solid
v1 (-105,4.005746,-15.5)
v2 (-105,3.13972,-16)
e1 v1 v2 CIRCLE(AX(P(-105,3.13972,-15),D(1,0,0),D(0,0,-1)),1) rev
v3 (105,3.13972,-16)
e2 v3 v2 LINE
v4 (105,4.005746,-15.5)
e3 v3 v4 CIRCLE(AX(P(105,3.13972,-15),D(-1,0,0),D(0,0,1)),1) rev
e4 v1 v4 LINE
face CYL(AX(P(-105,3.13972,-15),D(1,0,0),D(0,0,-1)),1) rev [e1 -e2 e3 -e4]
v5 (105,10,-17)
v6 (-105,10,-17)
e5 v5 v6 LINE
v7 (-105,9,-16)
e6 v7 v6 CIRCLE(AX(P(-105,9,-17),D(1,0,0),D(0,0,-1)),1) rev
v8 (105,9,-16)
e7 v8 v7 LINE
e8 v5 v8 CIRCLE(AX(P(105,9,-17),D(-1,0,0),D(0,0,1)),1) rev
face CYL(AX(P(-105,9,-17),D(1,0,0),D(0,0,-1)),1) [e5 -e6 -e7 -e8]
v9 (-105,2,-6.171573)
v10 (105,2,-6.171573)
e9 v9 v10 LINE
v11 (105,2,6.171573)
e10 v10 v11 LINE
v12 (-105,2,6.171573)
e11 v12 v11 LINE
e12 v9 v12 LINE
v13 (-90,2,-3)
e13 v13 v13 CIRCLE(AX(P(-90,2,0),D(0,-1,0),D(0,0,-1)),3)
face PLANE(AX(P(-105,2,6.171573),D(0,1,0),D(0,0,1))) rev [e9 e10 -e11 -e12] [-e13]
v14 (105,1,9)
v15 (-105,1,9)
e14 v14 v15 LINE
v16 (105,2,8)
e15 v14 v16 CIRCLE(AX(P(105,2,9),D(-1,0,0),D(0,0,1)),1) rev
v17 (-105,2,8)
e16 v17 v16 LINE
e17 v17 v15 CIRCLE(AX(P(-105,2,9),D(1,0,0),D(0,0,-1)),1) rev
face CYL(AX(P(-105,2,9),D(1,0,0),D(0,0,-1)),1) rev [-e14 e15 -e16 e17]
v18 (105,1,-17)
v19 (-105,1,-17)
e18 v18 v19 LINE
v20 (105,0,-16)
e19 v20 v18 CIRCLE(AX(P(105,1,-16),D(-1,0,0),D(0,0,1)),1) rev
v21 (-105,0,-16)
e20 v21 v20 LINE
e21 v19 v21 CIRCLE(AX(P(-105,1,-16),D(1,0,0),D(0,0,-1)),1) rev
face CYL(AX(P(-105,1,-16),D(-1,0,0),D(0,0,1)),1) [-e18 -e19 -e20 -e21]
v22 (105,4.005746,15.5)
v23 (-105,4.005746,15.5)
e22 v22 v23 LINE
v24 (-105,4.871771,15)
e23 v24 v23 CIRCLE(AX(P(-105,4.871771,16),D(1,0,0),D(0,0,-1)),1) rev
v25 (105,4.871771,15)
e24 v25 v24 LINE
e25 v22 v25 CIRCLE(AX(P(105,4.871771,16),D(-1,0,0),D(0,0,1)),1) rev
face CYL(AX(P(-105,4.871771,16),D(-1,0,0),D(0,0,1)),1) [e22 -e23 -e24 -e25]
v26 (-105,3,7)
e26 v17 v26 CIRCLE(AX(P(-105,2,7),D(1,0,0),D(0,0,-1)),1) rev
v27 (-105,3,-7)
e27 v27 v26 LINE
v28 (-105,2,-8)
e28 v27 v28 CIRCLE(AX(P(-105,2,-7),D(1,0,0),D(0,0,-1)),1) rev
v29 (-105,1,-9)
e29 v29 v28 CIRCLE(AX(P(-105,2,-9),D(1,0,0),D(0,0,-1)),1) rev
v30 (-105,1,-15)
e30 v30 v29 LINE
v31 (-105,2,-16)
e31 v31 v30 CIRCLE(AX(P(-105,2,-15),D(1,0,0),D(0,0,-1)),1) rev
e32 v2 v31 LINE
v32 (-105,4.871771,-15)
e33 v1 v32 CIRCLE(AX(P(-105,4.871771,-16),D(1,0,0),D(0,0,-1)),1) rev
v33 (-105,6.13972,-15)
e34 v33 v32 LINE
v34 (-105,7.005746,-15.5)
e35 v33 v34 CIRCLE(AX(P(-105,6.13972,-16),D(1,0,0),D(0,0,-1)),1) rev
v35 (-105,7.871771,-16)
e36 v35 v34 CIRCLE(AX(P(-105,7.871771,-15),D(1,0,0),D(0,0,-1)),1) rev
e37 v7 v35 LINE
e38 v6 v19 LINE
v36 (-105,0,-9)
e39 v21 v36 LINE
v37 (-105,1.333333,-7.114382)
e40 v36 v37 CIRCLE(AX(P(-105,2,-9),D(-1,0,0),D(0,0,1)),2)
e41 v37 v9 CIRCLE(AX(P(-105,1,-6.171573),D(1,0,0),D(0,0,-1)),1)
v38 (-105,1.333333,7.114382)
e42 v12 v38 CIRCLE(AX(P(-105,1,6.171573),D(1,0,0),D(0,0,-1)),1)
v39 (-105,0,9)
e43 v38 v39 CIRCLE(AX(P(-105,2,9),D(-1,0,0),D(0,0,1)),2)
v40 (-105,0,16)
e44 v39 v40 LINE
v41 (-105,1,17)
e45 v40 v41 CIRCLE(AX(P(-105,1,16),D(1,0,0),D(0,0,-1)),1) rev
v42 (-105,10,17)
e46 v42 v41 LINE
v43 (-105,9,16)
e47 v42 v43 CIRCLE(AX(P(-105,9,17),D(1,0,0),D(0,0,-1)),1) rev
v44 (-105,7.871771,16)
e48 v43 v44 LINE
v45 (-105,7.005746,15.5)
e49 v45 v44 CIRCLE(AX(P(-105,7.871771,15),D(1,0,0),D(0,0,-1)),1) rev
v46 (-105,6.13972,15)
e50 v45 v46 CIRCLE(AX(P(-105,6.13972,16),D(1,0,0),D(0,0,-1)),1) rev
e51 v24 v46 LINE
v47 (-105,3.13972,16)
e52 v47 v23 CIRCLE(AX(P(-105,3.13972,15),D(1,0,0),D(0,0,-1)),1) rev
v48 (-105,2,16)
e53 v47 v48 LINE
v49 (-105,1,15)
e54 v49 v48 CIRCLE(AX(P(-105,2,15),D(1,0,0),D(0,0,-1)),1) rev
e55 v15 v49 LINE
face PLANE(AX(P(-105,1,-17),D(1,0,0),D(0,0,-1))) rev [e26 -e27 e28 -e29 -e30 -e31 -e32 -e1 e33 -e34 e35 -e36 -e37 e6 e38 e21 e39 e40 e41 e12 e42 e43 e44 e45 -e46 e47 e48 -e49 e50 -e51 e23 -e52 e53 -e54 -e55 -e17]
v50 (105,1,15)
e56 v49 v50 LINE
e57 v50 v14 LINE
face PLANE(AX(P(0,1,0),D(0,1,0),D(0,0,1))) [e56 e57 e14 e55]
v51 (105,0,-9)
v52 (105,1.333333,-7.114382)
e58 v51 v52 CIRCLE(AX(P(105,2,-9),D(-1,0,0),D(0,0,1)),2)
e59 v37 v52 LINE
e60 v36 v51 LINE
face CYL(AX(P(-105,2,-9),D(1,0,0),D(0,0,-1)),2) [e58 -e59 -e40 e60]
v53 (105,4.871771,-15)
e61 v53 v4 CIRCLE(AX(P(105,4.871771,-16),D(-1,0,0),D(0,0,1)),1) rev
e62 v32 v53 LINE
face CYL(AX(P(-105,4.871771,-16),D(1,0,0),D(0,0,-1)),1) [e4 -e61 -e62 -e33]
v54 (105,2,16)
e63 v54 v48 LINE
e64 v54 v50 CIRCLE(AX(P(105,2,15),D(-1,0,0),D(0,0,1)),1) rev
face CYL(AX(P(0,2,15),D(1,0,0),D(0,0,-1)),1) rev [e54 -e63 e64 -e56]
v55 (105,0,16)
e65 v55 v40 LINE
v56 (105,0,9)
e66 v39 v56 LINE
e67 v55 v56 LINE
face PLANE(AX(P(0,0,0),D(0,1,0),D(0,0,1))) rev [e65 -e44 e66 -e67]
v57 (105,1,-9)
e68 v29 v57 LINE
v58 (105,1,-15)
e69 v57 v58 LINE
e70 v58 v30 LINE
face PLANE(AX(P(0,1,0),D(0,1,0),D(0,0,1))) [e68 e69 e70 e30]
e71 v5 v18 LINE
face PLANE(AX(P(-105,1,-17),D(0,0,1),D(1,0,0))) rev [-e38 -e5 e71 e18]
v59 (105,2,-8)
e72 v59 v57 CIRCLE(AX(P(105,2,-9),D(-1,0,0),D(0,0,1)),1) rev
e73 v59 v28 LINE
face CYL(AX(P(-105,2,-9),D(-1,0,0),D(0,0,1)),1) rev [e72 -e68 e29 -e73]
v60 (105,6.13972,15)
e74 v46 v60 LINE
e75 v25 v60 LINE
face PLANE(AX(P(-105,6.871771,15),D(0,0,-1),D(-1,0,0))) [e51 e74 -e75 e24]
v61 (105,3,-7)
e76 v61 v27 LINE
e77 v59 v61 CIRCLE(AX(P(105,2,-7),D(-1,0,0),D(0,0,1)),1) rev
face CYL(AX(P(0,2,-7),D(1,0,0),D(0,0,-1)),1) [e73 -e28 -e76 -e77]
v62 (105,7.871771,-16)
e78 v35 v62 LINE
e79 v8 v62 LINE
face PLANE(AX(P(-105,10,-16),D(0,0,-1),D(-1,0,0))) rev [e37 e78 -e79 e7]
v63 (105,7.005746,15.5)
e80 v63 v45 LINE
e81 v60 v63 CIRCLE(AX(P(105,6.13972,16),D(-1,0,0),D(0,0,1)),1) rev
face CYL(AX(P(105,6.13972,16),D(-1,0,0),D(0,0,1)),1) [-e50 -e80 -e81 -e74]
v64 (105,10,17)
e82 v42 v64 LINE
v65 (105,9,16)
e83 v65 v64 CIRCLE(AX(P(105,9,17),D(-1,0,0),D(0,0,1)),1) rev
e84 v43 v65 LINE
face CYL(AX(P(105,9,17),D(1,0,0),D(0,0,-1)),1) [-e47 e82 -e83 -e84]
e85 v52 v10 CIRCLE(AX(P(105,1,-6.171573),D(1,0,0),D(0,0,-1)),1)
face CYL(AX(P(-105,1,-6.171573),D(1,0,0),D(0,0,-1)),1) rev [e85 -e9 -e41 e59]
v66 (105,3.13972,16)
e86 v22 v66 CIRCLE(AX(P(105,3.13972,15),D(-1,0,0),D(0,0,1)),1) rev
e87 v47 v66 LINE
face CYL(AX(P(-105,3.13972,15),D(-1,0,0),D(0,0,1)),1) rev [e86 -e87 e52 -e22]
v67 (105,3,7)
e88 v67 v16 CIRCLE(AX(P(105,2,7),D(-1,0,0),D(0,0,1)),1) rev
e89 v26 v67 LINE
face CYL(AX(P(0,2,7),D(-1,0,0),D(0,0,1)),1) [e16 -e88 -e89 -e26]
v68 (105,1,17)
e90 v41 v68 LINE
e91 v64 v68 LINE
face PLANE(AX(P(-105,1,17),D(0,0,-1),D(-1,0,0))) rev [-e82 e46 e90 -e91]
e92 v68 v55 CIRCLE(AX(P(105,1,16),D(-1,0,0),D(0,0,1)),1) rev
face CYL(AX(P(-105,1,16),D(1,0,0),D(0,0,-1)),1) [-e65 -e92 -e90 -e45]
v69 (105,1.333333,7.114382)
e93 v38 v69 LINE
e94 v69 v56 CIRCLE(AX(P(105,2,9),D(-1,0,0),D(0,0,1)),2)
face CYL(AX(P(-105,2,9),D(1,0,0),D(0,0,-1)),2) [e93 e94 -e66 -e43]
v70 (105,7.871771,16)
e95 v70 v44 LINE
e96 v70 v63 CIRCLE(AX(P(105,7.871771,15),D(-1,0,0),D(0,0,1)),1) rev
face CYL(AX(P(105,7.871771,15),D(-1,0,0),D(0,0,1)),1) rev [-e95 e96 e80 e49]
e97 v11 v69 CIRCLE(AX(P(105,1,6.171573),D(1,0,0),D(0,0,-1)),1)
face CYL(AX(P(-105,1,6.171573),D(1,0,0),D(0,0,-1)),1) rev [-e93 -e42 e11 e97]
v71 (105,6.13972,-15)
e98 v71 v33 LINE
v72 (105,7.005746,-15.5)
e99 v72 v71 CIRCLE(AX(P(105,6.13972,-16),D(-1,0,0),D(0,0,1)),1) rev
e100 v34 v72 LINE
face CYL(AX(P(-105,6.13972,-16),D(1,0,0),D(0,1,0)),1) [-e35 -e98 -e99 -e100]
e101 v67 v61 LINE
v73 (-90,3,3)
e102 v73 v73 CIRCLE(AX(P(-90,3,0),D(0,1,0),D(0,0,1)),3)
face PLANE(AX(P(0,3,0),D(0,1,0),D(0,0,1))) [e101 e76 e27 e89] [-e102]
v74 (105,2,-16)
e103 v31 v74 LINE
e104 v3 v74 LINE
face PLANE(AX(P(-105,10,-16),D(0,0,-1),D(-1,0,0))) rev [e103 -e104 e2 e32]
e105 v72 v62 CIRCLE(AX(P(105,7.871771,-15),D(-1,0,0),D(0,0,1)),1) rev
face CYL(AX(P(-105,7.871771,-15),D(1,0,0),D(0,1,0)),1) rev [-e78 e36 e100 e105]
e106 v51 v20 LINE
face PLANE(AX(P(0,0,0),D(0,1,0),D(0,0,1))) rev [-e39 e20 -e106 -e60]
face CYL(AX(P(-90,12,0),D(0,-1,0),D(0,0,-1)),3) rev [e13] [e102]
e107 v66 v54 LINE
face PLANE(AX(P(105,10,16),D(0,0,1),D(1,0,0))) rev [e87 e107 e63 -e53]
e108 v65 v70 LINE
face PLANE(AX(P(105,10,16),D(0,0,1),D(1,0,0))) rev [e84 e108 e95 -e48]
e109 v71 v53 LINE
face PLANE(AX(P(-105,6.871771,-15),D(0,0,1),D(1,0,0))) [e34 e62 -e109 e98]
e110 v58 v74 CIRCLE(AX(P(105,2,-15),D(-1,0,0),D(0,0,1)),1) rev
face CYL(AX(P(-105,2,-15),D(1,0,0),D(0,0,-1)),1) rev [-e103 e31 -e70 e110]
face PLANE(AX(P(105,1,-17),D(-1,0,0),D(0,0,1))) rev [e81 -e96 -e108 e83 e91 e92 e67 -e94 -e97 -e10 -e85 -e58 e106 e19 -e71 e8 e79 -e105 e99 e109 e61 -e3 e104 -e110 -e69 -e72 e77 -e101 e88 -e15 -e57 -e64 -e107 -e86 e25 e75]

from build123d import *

# Parameters (mm, degrees)
SKETCH1_W           = 210
SKETCH1_H           = 34
BOSS_EXTRUDE1_DEPTH = 1
SKETCH2_W           = 210
SKETCH2_H           = 1
BOSS_EXTRUDE2_DEPTH = 9
SKETCH3_W           = 210
SKETCH3_H           = 16
BOSS_EXTRUDE3_DEPTH = 2
FILLET1_R           = 1
FILLET2_R           = 1
FILLET3_R           = 1
FILLET4_R           = 1
FILLET5_R           = 1
FILLET6_R           = 1
CUT_EXTRUDE1_DEPTH  = 211.924156985
FILLET7_R           = 1
FILLET8_R           = 1
FILLET9_R           = 1
FILLET10_R          = 1
SKETCH5_W           = 3
SKETCH5_H           = 3
BOSS_EXTRUDE4_DEPTH = 210
FILLET11_R          = 1
FILLET12_R          = 1
FILLET13_R          = 1
FILLET14_R          = 1
FILLET15_R          = 1
FILLET16_R          = 1
FILLET17_R          = 1
FILLET18_R          = 1
SKETCH6_W           = 1
SKETCH6_H           = 3
CUT_EXTRUDE2_DEPTH  = 210
SKETCH7_R           = 3
CUT_EXTRUDE3_DEPTH  = 10


with BuildPart() as part:
    # Sketch1 → Boss-Extrude1 (new body)
    with BuildSketch(Plane(origin=(0, 0, 0), x_dir=(1, 0, 0), z_dir=(0, 1, 0))):
        Rectangle(SKETCH1_W, SKETCH1_H)
    extrude(amount=BOSS_EXTRUDE1_DEPTH)

    # Sketch2 → Boss-Extrude2 (add)
    with BuildSketch(Plane(origin=(0, 1, 0), x_dir=(1, 0, 0), z_dir=(0, 1, 0))):
        with Locations((0, 16.5)):
            Rectangle(SKETCH2_W, SKETCH2_H)
        with Locations((0, -16.5)):
            Rectangle(SKETCH2_W, SKETCH2_H)
    extrude(amount=BOSS_EXTRUDE2_DEPTH)

    # Sketch3 → Boss-Extrude3 (add)
    with BuildSketch(Plane(origin=(0, 1, 0), x_dir=(1, 0, 0), z_dir=(0, 1, 0))):
        Rectangle(SKETCH3_W, SKETCH3_H)
    extrude(amount=BOSS_EXTRUDE3_DEPTH)

    # Fillet1
    fillet1_edges = [part.edges().sort_by_distance(p)[0] for p in [
        (0, 1, 8),
    ]]
    fillet(fillet1_edges, radius=FILLET1_R)

    # Fillet2
    fillet2_edges = [part.edges().sort_by_distance(p)[0] for p in [
        (0, 1, -8),
    ]]
    fillet(fillet2_edges, radius=FILLET2_R)

    # Fillet3
    fillet3_edges = [part.edges().sort_by_distance(p)[0] for p in [
        (0, 1, 16),
    ]]
    fillet(fillet3_edges, radius=FILLET3_R)

    # Fillet4
    fillet4_edges = [part.edges().sort_by_distance(p)[0] for p in [
        (0, 1, -16),
    ]]
    fillet(fillet4_edges, radius=FILLET4_R)

    # Fillet5
    fillet5_edges = [part.edges().sort_by_distance(p)[0] for p in [
        (0, 10, -16),
    ]]
    fillet(fillet5_edges, radius=FILLET5_R - 0.0001)  # a hair under: the kernel refuses the full size

    # Fillet6
    fillet6_edges = [part.edges().sort_by_distance(p)[0] for p in [
        (0, 10, 16),
    ]]
    fillet(fillet6_edges, radius=FILLET6_R - 0.0001)  # a hair under: the kernel refuses the full size

    # Sketch4 → Cut-Extrude1 (cut, through all)
    with BuildSketch(Plane(origin=(105, 0, 0), x_dir=(0, 0, -1), z_dir=(1, 0, 0))):
        with BuildLine():
            Line((-9, 0), (9, 0))
            ThreePointArc((9, 0), (7.845299462, 0.367006838), (7.114381917, 1.333333333))
            ThreePointArc((7.114381917, 1.333333333), (6.748923144, 1.816496581), (6.171572875, 2))
            Line((6.171572875, 2), (-6.171572875, 2))
            ThreePointArc((-6.171572875, 2), (-6.748923144, 1.816496581), (-7.114381917, 1.333333333))
            ThreePointArc((-7.114381917, 1.333333333), (-7.845299462, 0.367006838), (-9, 0))
        make_face()
    extrude(amount=-CUT_EXTRUDE1_DEPTH, mode=Mode.SUBTRACT)

    # Fillet7
    fillet7_edges = [part.edges().sort_by_distance(p)[0] for p in [
        (0, 3, 8),
    ]]
    fillet(fillet7_edges, radius=FILLET7_R - 0.0001)  # a hair under: the kernel refuses the full size

    # Fillet8
    fillet8_edges = [part.edges().sort_by_distance(p)[0] for p in [
        (0, 3, -8),
    ]]
    fillet(fillet8_edges, radius=FILLET8_R - 0.0001)  # a hair under: the kernel refuses the full size

    # Fillet9
    fillet9_edges = [part.edges().sort_by_distance(p)[0] for p in [
        (0, 0, -17),
    ]]
    fillet(fillet9_edges, radius=FILLET9_R)

    # Fillet10
    fillet10_edges = [part.edges().sort_by_distance(p)[0] for p in [
        (0, 0, 17),
    ]]
    fillet(fillet10_edges, radius=FILLET10_R)

    # Sketch5 → Boss-Extrude4 (add)
    with BuildSketch(Plane(origin=(105, 0, 0), x_dir=(0, 0, -1), z_dir=(1, 0, 0))):
        with Locations((-16.5, 5.371770908)):
            Rectangle(SKETCH5_W, SKETCH5_H)
        with Locations((16.5, 5.371770908)):
            Rectangle(SKETCH5_W, SKETCH5_H)
    extrude(amount=-BOSS_EXTRUDE4_DEPTH)

    # Fillet11
    fillet11_edges = [part.edges().sort_by_distance(p)[0] for p in [
        (0, 6.871770908, 16),
    ]]
    fillet(fillet11_edges, radius=FILLET11_R - 0.0001)  # a hair under: the kernel refuses the full size

    # Fillet12
    fillet12_edges = [part.edges().sort_by_distance(p)[0] for p in [
        (0, 6.871770908, 15),
    ]]
    fillet(fillet12_edges, radius=FILLET12_R)

    # Fillet13
    fillet13_edges = [part.edges().sort_by_distance(p)[0] for p in [
        (0, 3.871770908, 15),
    ]]
    fillet(fillet13_edges, radius=FILLET13_R - 0.0001)  # a hair under: the kernel refuses the full size

    # Fillet14
    fillet14_edges = [part.edges().sort_by_distance(p)[0] for p in [
        (0, 3.871770908, 16),
    ]]
    fillet(fillet14_edges, radius=FILLET14_R)

    # Fillet15
    fillet15_edges = [part.edges().sort_by_distance(p)[0] for p in [
        (0, 6.871770908, -16),
    ]]
    fillet(fillet15_edges, radius=FILLET15_R - 0.0001)  # a hair under: the kernel refuses the full size

    # Fillet16
    fillet16_edges = [part.edges().sort_by_distance(p)[0] for p in [
        (0, 6.871770908, -15),
    ]]
    fillet(fillet16_edges, radius=FILLET16_R)

    # Fillet17
    fillet17_edges = [part.edges().sort_by_distance(p)[0] for p in [
        (0, 3.871770908, -15),
    ]]
    fillet(fillet17_edges, radius=FILLET17_R - 0.0001)  # a hair under: the kernel refuses the full size

    # Fillet18
    fillet18_edges = [part.edges().sort_by_distance(p)[0] for p in [
        (0, 3.871770908, -16),
    ]]
    fillet(fillet18_edges, radius=FILLET18_R)

    # Sketch6 → Cut-Extrude2 (cut)
    with BuildSketch(Plane(origin=(105, 0, 0), x_dir=(0, 0, -1), z_dir=(1, 0, 0))):
        with Locations((-17.5, 5.371770908)):
            Rectangle(SKETCH6_W, SKETCH6_H)
        with Locations((17.5, 5.371770908)):
            Rectangle(SKETCH6_W, SKETCH6_H)
    extrude(amount=-CUT_EXTRUDE2_DEPTH, mode=Mode.SUBTRACT)

    # Sketch7 → Cut-Extrude3 (cut)
    with BuildSketch(Plane.XZ.offset(-2)):
        with Locations(Location((-90, 0, 0), (0, 0, 270))):
            Circle(SKETCH7_R)
    extrude(amount=-CUT_EXTRUDE3_DEPTH, mode=Mode.SUBTRACT)


solid = part.part
